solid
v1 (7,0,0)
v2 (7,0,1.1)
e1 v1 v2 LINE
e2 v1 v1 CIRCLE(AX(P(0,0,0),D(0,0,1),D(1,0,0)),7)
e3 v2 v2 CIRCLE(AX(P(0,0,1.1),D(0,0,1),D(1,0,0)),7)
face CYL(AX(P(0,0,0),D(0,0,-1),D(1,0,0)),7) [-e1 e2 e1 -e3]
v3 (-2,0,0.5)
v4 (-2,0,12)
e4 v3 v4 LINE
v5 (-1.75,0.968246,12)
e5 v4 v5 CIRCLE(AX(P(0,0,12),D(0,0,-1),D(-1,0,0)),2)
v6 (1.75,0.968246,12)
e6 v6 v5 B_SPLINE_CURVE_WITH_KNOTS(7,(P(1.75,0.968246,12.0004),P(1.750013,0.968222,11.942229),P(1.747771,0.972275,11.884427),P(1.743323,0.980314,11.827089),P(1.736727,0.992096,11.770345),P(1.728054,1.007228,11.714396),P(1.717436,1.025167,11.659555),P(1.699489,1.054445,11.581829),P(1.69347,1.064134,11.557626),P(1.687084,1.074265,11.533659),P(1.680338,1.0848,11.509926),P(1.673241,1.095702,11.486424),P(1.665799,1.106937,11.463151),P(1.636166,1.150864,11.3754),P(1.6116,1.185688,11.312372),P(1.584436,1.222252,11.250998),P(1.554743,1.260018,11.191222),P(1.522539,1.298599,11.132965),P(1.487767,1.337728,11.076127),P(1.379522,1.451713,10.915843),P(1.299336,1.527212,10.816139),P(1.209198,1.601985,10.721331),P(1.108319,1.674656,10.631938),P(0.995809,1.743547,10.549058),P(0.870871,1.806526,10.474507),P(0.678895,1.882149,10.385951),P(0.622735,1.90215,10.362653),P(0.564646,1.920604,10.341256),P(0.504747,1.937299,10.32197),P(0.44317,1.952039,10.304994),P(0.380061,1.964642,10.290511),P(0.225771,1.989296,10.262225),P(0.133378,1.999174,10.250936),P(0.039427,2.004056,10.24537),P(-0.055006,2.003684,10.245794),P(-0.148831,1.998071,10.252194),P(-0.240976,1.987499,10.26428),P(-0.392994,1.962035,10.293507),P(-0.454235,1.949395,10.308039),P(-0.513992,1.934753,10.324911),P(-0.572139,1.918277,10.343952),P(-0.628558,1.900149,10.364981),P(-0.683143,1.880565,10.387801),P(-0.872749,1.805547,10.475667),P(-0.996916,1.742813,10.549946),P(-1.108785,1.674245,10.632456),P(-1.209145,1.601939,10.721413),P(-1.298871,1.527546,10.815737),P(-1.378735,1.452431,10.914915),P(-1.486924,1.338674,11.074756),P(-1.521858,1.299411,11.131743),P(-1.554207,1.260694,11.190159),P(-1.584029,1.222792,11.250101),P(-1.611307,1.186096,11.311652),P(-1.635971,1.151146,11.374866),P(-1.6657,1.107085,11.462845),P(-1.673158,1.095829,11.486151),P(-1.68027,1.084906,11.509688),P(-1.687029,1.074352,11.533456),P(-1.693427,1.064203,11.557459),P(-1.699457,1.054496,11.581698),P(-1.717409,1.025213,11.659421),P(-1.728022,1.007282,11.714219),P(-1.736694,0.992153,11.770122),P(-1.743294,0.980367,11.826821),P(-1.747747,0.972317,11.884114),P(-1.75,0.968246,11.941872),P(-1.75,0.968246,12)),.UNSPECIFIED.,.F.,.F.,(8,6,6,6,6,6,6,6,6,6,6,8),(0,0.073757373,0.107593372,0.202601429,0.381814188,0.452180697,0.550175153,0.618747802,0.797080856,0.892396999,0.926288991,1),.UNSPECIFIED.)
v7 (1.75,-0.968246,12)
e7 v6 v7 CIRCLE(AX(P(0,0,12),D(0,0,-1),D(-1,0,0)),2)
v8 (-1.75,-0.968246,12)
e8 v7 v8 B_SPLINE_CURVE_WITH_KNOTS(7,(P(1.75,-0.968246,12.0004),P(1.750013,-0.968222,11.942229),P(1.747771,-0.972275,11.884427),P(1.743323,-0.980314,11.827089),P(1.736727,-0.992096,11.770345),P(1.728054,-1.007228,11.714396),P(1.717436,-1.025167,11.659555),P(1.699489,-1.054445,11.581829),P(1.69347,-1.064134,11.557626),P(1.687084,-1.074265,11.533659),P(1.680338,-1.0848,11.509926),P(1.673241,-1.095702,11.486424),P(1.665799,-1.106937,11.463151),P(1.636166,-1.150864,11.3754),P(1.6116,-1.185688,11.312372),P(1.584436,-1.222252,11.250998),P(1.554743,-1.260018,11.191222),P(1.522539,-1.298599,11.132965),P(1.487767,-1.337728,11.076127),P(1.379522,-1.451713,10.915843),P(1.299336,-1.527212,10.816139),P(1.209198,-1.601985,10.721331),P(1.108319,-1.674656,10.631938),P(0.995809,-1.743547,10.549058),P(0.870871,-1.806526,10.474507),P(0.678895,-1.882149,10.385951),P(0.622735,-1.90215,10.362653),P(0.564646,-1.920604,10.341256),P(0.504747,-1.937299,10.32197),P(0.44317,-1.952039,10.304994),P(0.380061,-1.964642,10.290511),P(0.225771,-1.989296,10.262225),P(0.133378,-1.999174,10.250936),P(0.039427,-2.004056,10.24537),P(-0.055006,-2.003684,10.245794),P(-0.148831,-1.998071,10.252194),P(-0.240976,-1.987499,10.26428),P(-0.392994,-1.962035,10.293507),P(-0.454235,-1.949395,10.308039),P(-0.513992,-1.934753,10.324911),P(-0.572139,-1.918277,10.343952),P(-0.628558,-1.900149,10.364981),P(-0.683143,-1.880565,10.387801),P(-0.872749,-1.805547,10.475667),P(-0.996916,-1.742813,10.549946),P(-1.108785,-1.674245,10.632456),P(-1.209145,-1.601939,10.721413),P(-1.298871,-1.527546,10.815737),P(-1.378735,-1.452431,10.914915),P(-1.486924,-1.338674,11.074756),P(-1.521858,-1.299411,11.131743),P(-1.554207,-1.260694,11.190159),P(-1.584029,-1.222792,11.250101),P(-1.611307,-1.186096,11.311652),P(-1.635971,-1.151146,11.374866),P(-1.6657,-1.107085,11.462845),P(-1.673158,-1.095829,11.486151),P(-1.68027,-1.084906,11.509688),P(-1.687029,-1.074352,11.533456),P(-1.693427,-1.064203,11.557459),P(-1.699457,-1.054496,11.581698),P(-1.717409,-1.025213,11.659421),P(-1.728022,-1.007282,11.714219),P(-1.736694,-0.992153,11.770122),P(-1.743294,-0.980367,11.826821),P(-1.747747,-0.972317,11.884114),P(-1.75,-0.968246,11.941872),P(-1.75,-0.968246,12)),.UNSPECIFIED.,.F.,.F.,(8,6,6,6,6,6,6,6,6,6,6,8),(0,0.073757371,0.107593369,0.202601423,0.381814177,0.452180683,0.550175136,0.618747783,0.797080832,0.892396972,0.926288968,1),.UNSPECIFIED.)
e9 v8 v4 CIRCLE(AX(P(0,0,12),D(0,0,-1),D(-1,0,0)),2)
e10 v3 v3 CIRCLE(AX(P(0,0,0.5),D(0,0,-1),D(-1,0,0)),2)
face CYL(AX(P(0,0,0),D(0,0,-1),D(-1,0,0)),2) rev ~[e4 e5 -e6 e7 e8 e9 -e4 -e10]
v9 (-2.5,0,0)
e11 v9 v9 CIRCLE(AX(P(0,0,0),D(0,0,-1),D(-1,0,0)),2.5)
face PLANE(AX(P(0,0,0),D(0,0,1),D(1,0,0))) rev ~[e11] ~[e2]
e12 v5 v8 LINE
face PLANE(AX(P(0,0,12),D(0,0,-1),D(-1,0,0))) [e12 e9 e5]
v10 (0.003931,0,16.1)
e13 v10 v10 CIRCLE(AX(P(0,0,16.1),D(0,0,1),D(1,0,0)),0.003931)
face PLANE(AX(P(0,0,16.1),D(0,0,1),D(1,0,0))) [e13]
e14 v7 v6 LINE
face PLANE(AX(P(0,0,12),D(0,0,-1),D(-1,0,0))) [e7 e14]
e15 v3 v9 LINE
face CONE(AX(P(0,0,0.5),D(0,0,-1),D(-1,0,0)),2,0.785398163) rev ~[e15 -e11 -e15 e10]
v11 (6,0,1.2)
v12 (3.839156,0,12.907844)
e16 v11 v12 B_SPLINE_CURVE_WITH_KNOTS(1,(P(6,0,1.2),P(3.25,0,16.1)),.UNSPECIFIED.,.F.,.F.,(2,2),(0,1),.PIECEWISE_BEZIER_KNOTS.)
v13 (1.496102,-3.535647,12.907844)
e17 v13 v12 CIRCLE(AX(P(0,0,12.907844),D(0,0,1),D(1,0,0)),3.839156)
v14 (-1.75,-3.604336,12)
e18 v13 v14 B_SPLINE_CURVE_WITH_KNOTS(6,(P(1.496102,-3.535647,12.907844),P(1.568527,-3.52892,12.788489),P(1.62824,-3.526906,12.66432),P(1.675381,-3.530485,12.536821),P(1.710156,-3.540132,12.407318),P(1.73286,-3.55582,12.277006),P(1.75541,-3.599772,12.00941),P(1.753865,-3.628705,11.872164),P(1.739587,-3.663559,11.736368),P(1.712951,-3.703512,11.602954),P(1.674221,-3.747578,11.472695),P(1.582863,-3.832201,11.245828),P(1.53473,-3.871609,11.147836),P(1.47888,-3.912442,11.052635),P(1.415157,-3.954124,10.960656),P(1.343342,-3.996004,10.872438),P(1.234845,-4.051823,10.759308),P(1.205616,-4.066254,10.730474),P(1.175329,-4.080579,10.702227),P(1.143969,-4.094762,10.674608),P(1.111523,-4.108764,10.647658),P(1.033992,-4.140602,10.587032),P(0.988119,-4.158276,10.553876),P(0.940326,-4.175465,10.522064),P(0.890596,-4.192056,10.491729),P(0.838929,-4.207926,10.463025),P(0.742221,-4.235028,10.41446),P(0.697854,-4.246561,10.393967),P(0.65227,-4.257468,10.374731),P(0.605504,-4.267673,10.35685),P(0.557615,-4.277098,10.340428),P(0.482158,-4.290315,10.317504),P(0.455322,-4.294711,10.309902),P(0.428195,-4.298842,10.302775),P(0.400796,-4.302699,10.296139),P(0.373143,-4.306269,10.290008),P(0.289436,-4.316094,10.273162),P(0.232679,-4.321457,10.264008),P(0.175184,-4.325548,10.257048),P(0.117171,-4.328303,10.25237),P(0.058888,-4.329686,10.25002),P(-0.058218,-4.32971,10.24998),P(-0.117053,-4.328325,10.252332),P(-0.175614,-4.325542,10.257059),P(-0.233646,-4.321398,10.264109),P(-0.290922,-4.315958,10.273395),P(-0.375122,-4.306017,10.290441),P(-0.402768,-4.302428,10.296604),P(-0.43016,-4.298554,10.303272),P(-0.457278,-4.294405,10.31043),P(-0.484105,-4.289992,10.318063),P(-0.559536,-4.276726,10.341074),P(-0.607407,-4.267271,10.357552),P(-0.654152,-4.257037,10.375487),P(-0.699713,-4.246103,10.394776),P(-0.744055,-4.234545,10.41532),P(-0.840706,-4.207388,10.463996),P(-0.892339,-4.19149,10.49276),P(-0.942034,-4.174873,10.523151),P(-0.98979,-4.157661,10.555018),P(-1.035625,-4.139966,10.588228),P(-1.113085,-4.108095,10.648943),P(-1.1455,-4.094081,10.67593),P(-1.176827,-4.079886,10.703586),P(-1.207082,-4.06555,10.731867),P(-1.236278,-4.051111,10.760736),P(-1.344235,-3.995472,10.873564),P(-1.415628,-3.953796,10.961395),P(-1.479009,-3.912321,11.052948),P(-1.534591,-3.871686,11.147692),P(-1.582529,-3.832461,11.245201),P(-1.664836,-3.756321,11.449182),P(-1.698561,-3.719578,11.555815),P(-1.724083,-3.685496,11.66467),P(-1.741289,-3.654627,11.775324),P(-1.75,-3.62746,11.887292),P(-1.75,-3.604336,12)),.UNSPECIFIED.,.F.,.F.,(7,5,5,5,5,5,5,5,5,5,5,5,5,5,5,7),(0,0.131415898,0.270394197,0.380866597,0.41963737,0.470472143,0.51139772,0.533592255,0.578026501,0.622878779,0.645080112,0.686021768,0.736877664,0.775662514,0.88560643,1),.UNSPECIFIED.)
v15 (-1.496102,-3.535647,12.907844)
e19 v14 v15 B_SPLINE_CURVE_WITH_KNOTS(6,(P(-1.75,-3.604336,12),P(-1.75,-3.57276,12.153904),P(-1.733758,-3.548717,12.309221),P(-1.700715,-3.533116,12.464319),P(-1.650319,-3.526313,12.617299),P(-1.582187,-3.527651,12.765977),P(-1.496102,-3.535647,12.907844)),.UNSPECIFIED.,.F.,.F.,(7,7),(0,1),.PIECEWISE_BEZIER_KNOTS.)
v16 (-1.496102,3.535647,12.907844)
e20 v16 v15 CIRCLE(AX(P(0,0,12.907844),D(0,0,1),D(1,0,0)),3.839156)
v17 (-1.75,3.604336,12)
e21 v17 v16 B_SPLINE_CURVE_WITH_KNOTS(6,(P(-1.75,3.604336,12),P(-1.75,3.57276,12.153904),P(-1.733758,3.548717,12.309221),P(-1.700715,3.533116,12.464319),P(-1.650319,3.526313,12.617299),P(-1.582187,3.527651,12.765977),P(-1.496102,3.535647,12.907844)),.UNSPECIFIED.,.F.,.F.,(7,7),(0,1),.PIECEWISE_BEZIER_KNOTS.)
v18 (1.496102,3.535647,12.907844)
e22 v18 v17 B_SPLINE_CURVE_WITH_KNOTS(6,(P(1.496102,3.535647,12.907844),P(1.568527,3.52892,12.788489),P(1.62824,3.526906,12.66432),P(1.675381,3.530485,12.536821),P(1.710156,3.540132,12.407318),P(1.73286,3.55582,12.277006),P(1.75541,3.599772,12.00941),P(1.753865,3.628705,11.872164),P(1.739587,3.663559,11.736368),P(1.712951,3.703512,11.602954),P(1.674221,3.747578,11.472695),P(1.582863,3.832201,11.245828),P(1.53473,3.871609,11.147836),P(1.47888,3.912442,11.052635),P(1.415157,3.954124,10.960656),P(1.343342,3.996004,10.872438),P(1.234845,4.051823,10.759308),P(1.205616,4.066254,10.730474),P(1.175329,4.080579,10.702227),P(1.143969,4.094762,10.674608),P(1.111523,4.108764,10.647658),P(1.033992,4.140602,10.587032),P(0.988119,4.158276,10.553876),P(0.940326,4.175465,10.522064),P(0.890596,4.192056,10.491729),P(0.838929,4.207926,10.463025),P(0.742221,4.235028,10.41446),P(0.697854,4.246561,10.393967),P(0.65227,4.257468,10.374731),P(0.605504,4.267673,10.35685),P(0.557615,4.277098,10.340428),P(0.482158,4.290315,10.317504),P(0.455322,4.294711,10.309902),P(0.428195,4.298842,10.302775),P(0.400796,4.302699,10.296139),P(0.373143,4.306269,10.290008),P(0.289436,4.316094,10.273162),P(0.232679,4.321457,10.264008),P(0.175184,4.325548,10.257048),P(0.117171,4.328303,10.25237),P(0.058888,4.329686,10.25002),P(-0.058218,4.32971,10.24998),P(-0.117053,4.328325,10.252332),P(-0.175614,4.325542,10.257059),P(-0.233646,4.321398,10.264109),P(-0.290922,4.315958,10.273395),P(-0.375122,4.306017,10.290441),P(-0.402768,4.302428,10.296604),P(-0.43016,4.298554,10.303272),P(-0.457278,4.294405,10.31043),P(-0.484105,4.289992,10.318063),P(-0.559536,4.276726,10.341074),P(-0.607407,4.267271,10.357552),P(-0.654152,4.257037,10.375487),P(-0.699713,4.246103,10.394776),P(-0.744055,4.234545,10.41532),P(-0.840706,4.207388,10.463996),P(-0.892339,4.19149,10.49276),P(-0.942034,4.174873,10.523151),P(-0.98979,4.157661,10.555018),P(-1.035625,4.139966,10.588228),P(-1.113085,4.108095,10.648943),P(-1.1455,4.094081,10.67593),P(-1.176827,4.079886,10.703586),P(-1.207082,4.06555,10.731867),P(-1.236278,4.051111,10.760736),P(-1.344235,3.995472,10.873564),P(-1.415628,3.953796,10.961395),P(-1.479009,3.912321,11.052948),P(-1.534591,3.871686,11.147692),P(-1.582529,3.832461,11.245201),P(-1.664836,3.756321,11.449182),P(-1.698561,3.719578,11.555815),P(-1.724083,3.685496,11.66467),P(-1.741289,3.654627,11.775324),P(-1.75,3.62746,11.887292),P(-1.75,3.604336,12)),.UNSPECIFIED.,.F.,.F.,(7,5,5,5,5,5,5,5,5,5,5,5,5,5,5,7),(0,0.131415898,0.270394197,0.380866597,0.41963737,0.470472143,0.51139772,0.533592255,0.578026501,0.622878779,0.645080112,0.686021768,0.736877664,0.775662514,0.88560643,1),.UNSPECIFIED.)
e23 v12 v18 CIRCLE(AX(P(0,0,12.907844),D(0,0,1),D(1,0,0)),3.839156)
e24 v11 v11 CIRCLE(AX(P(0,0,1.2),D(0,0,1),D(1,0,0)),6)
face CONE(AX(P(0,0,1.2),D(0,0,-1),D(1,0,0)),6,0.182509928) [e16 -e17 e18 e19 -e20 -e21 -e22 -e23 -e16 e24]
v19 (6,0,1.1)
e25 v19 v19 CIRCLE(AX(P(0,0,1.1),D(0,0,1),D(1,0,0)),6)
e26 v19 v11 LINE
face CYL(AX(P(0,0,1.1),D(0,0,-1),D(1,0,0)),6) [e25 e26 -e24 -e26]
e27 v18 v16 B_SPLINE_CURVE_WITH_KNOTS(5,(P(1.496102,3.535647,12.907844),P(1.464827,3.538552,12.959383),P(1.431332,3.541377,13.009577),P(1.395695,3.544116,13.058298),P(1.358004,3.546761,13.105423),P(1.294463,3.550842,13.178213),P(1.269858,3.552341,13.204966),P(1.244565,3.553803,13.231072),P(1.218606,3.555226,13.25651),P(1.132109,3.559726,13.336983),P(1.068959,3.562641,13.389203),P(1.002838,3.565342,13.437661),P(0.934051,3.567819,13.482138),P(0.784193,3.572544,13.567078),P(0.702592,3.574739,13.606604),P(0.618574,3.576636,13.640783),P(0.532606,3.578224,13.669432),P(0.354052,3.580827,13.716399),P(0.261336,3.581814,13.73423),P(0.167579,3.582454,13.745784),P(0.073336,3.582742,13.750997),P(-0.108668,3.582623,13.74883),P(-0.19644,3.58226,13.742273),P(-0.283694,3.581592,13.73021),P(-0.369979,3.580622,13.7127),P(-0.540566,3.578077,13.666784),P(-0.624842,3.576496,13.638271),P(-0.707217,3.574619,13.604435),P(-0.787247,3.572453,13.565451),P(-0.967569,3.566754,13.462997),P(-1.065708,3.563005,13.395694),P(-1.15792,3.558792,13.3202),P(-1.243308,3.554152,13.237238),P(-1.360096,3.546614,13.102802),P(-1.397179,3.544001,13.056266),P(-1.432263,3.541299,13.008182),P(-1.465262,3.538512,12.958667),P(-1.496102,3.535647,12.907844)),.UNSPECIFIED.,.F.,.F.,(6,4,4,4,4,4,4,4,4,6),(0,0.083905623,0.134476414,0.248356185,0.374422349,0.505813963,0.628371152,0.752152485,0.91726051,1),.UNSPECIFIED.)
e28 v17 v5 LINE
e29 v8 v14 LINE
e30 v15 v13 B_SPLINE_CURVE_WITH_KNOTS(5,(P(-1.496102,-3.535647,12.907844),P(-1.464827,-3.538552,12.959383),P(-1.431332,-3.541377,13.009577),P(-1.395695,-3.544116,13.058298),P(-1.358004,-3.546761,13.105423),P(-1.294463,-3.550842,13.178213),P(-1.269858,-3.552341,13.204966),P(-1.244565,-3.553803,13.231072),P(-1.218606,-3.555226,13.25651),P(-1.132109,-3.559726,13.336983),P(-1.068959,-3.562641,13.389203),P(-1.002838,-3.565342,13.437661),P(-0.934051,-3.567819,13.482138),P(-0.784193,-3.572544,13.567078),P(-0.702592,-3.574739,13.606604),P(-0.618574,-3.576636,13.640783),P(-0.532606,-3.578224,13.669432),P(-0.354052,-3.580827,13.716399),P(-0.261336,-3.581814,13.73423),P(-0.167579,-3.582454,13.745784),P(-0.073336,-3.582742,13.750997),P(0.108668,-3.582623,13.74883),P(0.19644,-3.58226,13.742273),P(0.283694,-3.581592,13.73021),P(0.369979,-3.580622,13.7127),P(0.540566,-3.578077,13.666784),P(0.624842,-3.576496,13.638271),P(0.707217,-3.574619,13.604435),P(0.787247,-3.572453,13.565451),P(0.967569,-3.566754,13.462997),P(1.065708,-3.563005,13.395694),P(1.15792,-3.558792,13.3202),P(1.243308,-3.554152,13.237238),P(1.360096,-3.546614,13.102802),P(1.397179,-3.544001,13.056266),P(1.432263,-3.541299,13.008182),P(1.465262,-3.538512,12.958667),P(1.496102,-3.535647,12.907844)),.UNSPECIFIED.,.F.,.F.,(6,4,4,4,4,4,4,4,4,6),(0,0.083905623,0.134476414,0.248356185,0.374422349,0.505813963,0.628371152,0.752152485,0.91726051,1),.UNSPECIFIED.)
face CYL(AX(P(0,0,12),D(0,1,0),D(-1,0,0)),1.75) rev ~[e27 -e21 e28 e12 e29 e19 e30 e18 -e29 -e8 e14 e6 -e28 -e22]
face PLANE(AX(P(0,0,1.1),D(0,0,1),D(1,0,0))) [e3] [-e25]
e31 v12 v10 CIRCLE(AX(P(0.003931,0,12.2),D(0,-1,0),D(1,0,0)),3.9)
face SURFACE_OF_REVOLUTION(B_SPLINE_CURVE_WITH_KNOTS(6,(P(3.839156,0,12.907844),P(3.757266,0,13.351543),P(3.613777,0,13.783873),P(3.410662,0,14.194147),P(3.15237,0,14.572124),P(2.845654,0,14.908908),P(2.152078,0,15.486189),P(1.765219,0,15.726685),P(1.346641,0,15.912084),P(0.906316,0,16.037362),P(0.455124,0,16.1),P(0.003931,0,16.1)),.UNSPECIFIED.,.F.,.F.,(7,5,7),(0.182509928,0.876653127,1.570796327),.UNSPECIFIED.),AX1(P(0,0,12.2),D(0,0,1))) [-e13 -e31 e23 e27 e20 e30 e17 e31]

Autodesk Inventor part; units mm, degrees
ref_plane "YZ Plane" through (0, 0, 0) normal (1, 0, 0) x (0, 1, 0)
ref_plane "XZ Plane" through (0, 0, 0) normal (0, 1, 0) x (-1, 0, 0)
sketch "Sketch1" plane through (0, 0, 0) normal (0, 0, 1) x (1, 0, 0)
  circle A0 centre (0, 0) radius 7
  dimension "d0" = 14
extrude "Extrusion1" add sketch "Sketch1" along normal blind 1.1
sketch "Sketch2" plane through (0, 0, 1.1) normal (0, 0, 1) x (1, 0, 0)
  circle A0 centre (0, 0) radius 7 projected
  circle A1 centre (0, 0) radius 6
  dimension "d3" = 12
ref_plane "Work Plane1" through (0, 0, 16.1) normal (0, 0, 1) x (1, 0, 0)
sketch "Sketch3" plane through (0, 0, 16.1) normal (0, 0, 1) x (1, 0, 0)
  circle A0 centre (0, 0) radius 3.25
  dimension "d5" = 6.5
extrude "Extrusion2" add sketch "Sketch2" along normal blind 0.1 contours A1
loft "Loft1" add profiles "Sketch3" section 1 edges at (-6, 0, 1.2)
fillet "Fillet1" radius 3.9 1 edges at (-3.25, 0, 16.1)
sketch "Sketch4" plane through (0, 0, 0) normal (0, 1, 0) x (-1, 0, 0)
  circle A0 centre (0, 12) radius 1.75
  point P0 (0, 0)
  dimension "d13" = 12
  dimension "d14" = 3.5
extrude "Extrusion3" cut sketch "Sketch4" along normal through all both and the other way through all
sketch "Sketch5" plane through (0, 0, 0) normal (0, 0, -1) x (-1, 0, 0)
  circle A0 centre (0, 0) radius 7 projected
  circle A1 centre (0, 0) radius 2
  dimension "d17" = 4
extrude "Extrusion4" cut sketch "Sketch5" against normal blind 12 contours A1
chamfer "Chamfer1" distance 0.5 angle 45 1 edges at (2, 0, 0)
properties part number "nut"
